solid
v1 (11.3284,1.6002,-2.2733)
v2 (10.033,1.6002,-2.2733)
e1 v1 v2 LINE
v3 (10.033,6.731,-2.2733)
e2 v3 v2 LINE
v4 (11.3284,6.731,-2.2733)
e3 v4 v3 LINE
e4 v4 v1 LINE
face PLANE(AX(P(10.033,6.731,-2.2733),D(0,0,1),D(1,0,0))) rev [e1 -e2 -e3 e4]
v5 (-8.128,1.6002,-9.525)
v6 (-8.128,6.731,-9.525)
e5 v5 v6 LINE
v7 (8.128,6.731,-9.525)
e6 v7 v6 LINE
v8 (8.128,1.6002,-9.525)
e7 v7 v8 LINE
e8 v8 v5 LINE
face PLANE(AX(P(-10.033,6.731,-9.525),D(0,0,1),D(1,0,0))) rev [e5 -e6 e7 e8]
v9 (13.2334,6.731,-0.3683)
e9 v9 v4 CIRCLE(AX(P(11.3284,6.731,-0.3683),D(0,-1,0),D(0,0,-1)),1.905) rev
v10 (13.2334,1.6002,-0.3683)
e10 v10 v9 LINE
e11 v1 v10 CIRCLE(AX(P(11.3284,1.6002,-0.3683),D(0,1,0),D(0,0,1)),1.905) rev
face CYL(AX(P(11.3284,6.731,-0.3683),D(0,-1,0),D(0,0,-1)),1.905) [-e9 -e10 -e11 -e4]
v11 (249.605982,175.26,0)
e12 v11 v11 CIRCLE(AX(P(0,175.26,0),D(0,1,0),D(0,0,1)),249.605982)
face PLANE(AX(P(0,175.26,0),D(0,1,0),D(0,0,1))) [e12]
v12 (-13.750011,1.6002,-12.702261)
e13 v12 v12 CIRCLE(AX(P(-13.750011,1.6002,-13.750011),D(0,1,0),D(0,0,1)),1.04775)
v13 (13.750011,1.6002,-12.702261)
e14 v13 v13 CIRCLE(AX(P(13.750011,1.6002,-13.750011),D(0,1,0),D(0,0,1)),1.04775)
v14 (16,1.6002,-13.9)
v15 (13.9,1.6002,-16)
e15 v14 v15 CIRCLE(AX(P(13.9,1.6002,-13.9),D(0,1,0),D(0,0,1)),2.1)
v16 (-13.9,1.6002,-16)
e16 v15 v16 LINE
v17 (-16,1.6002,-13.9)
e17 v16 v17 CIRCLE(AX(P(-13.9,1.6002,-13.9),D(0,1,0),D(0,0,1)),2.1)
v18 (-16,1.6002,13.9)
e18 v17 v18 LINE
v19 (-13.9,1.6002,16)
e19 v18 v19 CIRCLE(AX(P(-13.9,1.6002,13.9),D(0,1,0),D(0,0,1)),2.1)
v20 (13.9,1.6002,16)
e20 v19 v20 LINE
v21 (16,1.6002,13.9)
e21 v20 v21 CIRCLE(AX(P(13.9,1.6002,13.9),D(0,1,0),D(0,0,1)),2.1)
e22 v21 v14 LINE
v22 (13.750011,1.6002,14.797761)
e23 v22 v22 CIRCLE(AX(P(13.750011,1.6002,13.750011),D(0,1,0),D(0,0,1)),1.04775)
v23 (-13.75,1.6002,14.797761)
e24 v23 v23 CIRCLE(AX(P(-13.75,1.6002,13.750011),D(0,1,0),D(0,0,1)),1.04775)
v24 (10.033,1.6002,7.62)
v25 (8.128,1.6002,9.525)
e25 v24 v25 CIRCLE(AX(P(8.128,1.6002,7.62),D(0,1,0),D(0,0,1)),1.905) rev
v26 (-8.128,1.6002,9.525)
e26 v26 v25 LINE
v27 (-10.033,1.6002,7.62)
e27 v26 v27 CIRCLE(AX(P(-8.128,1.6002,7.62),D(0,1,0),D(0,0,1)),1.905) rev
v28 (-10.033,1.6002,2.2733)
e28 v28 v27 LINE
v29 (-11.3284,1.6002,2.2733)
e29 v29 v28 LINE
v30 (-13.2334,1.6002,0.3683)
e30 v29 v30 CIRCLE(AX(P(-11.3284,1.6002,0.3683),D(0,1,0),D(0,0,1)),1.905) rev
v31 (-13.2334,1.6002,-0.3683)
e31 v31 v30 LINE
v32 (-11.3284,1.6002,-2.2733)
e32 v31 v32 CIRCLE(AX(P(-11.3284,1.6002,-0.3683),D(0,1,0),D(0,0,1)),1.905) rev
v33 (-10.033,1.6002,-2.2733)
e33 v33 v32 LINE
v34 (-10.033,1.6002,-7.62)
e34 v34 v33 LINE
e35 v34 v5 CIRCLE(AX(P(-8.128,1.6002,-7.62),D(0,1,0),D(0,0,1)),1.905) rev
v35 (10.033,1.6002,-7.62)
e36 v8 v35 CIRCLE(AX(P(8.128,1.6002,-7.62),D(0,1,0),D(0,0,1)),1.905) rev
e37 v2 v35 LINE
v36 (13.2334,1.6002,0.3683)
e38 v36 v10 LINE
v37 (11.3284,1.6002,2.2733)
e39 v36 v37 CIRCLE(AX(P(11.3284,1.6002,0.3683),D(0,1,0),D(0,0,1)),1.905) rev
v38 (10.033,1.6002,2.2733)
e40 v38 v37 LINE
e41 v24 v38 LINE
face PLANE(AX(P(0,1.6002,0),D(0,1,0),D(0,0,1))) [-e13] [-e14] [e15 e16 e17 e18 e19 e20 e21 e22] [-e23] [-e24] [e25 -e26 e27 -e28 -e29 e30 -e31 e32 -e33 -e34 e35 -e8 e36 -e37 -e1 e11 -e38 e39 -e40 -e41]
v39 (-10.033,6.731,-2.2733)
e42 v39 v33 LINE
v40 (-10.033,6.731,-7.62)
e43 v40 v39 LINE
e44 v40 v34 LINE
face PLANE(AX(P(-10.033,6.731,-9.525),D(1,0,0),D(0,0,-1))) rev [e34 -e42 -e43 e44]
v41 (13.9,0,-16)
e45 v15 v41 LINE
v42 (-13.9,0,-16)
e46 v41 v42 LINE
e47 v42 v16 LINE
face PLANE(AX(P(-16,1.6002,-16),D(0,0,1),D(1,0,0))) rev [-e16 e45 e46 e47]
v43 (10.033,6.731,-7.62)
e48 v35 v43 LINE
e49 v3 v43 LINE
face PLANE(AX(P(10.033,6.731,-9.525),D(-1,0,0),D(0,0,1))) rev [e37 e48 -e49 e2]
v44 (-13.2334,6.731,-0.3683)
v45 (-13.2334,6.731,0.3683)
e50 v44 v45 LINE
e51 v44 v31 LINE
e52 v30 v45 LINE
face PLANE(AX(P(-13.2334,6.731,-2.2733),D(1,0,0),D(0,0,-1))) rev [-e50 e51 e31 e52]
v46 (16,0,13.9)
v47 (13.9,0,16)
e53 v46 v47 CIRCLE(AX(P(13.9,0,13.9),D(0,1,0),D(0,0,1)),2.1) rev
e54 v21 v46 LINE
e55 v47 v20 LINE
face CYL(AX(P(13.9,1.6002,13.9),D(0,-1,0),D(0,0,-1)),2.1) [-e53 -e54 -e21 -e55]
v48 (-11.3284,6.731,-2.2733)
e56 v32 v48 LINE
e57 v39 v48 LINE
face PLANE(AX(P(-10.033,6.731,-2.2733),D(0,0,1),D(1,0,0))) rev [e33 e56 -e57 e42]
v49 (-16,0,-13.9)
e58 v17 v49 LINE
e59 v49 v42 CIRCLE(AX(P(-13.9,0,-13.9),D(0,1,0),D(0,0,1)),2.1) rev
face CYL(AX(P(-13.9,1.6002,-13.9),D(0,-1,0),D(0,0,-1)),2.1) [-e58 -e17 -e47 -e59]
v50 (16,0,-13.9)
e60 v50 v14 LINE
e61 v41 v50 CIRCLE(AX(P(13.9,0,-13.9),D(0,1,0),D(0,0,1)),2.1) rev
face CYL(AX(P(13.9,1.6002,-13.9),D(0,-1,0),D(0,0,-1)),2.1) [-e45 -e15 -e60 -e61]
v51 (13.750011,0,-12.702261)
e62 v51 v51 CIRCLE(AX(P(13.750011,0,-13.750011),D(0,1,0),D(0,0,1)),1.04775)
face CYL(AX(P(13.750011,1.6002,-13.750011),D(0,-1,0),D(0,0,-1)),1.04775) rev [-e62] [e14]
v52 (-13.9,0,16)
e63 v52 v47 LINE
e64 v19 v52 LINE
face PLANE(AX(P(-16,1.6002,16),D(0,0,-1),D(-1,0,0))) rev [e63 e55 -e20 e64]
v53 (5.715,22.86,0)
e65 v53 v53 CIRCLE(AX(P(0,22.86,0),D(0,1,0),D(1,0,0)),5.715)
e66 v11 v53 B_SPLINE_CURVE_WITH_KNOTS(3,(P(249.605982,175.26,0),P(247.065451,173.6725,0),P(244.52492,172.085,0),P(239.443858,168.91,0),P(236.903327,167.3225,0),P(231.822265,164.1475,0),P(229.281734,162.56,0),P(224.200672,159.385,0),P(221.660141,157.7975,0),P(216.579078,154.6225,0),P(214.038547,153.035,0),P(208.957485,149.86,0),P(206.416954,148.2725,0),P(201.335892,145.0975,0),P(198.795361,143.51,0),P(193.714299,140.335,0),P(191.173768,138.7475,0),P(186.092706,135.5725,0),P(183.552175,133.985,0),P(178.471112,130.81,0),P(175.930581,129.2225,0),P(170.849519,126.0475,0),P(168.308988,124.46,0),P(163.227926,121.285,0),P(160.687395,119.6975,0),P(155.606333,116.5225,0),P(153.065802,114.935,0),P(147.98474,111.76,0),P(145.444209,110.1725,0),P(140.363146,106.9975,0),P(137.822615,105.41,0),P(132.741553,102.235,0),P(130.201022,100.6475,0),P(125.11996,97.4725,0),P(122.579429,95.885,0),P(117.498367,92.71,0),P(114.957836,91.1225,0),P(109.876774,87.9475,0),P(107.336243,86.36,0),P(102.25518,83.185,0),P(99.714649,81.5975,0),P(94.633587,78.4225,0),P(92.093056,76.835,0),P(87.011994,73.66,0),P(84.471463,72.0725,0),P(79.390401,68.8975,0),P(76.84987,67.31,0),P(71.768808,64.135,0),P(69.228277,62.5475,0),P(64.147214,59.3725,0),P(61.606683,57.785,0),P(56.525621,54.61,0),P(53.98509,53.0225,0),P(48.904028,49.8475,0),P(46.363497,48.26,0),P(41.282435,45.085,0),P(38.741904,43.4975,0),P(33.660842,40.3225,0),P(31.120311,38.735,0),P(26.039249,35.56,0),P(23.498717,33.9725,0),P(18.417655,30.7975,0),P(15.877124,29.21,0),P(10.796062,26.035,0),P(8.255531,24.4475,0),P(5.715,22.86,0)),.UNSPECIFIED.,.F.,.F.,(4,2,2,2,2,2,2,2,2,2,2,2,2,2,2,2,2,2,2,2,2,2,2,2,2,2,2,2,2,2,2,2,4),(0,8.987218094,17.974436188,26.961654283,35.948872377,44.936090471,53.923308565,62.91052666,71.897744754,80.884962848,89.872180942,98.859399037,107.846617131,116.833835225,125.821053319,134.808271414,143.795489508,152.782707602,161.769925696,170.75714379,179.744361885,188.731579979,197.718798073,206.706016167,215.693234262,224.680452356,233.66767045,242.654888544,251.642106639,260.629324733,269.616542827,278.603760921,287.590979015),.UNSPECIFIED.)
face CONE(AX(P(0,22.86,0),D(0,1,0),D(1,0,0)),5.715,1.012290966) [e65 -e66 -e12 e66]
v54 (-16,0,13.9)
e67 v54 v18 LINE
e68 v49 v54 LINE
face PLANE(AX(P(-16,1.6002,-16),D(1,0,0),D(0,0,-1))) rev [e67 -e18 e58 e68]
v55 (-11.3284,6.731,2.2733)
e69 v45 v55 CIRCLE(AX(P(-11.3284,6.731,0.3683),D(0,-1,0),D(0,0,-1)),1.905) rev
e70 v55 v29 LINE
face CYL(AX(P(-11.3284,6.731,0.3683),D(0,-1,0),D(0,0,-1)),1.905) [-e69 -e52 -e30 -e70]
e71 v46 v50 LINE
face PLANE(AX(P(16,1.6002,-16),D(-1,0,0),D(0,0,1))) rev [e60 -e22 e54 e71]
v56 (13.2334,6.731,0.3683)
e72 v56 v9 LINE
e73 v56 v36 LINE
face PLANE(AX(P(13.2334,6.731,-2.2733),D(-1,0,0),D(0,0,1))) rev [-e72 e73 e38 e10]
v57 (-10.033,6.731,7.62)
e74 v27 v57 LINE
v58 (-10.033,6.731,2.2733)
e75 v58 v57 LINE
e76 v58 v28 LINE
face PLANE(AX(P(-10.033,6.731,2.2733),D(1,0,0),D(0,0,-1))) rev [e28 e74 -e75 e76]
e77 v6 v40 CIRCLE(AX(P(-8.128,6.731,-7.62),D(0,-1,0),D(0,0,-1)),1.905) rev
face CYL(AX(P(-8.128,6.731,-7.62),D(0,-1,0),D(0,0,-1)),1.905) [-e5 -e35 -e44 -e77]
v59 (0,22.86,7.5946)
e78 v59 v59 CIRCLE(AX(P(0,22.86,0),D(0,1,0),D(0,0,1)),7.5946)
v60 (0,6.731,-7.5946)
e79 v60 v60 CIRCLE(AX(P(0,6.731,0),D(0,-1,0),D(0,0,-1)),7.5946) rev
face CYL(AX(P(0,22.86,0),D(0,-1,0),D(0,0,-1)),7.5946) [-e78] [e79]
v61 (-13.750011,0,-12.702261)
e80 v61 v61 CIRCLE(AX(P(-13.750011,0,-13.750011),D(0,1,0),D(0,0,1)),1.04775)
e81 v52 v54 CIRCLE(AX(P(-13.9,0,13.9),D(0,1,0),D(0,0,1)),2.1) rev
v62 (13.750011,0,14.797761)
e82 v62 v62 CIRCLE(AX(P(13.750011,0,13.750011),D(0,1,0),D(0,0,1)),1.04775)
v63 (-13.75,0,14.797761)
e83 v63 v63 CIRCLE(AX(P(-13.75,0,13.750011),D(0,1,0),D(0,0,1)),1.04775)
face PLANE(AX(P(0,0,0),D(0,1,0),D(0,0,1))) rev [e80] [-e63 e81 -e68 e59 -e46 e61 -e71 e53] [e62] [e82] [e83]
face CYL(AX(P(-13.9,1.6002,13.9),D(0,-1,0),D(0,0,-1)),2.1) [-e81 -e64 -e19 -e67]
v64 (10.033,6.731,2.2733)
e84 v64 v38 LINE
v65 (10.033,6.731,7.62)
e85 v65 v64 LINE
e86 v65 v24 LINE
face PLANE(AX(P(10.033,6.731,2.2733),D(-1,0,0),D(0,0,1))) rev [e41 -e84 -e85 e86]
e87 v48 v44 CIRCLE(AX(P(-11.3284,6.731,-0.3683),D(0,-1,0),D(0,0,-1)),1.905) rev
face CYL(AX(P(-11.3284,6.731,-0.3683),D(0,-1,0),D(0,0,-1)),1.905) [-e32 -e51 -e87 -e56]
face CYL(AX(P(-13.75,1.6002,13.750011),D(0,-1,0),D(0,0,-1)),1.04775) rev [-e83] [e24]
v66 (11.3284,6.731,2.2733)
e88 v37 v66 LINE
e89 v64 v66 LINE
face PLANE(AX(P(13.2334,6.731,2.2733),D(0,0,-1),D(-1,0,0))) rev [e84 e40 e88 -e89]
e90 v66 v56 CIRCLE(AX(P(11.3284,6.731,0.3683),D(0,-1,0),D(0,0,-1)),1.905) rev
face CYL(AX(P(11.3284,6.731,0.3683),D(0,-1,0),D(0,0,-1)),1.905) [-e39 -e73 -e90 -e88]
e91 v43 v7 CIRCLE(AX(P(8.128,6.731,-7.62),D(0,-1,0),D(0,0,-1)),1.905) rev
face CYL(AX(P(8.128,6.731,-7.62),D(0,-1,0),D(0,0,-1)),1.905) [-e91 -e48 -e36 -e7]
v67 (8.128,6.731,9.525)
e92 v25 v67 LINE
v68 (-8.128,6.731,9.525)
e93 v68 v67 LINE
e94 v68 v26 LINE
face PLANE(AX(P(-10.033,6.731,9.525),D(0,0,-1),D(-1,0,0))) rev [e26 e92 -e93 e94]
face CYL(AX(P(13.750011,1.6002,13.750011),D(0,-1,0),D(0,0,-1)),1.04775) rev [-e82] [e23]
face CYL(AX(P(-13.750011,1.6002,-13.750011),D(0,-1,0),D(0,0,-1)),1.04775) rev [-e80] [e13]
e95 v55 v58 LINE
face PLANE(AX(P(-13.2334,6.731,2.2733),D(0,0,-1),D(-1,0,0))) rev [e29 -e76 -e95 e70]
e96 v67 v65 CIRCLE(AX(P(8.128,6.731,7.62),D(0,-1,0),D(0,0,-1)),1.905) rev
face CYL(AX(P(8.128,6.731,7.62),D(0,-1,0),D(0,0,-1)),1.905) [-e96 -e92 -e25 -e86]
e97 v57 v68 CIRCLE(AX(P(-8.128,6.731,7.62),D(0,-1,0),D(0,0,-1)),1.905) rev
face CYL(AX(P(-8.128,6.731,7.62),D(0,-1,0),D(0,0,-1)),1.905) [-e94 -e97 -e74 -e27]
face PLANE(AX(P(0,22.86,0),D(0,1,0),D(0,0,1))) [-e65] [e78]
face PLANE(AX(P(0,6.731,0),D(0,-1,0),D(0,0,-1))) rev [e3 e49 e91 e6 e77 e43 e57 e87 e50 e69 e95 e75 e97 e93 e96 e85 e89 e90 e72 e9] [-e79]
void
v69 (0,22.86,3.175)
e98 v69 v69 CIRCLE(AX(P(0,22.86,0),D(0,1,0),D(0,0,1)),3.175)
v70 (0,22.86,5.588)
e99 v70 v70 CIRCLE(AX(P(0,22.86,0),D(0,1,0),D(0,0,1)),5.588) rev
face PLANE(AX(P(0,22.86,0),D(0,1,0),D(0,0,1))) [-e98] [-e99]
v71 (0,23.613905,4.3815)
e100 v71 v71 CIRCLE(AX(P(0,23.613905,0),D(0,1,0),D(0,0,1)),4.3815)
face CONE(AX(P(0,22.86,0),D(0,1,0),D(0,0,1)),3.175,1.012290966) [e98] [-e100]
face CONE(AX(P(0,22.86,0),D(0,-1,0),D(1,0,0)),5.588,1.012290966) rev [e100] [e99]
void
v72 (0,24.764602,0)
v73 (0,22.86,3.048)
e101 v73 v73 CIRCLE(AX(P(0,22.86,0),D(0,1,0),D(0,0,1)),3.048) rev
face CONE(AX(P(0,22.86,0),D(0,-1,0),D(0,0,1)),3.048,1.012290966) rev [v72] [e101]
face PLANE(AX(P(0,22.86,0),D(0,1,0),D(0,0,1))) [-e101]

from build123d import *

# Parameters (mm, degrees)
SKETCH1_W           = 32
SKETCH1_H           = 32
SKETCH1_R           = 1.04775
BOSS_EXTRUDE1_DEPTH = 1.6002
BOSS_EXTRUDE2_DEPTH = 5.1308
FILLET1_R           = 2.1
FILLET2_R           = 1.905
SKETCH3_R           = 7.5946
BOSS_EXTRUDE3_DEPTH = 16.129


# Read off the part's stored shape, not the designer's step: Extrude-Thin2
with BuildPart() as part:
    # Sketch1 → Boss-Extrude1 (new body)
    with BuildSketch(Plane(origin=(0, 0, 0), x_dir=(1, 0, 0), z_dir=(0, 1, 0))):
        Rectangle(SKETCH1_W, SKETCH1_H)
        with Locations(Location((13.7500106, 13.7500106, 0), (0, 0, 270))):
            Circle(SKETCH1_R, mode=Mode.SUBTRACT)
        with Locations(Location((-13.7500106, 13.7500106, 0), (0, 0, 270))):
            Circle(SKETCH1_R, mode=Mode.SUBTRACT)
        with Locations(Location((-13.75, -13.7500106, 0), (0, 0, 270))):
            Circle(SKETCH1_R, mode=Mode.SUBTRACT)
        with Locations(Location((13.7500106, -13.7500106, 0), (0, 0, 270))):
            Circle(SKETCH1_R, mode=Mode.SUBTRACT)
    extrude(amount=BOSS_EXTRUDE1_DEPTH)

    # Sketch2 → Boss-Extrude2 (add)
    with BuildSketch(Plane(origin=(0, 1.6002, 0), x_dir=(1, 0, 0), z_dir=(0, 1, 0))):
        Polygon((-10.033, 9.525), (10.033, 9.525), (10.033, 2.2733), (13.2334, 2.2733), (13.2334, -2.2733), (10.033, -2.2733), (10.033, -9.525), (-10.033, -9.525), (-10.033, -2.2733), (-13.2334, -2.2733), (-13.2334, 2.2733), (-10.033, 2.2733), align=None)
    extrude(amount=BOSS_EXTRUDE2_DEPTH)

    # Fillet1
    fillet1_edges = [part.edges().sort_by_distance(p)[0] for p in [
        (-16, 0.8001, -16),
        (16, 0.8001, -16),
        (16, 0.8001, 16),
        (-16, 0.8001, 16),
    ]]
    fillet(fillet1_edges, radius=FILLET1_R)

    # Fillet2
    fillet2_edges = [part.edges().sort_by_distance(p)[0] for p in [
        (-10.033, 4.1656, -9.525),
        (-13.2334, 4.1656, -2.2733),
        (-13.2334, 4.1656, 2.2733),
        (-10.033, 4.1656, 9.525),
        (10.033, 4.1656, 9.525),
        (13.2334, 4.1656, 2.2733),
        (13.2334, 4.1656, -2.2733),
        (10.033, 4.1656, -9.525),
    ]]
    fillet(fillet2_edges, radius=FILLET2_R)

    # Sketch3 → Boss-Extrude3 (add)
    with BuildSketch(Plane(origin=(0, 6.731, 0), x_dir=(1, 0, 0), z_dir=(0, 1, 0))):
        with Locations(Location((0, 0, 0), (0, 0, 90))):
            Circle(SKETCH3_R)
    extrude(amount=BOSS_EXTRUDE3_DEPTH)

    # Extrude-Thin2 outline → Extrude-Thin2 (revolve)
    with BuildSketch(Plane.XY):
        Polygon((0, 175.26), (0, 24.764601785), (3.048, 22.86), (3.175, 22.86), (4.3815, 23.613904873), (5.588, 22.86), (5.715, 22.86), (249.605982226, 175.26), align=None)
    revolve(axis=Axis((0, 0, 0), (0, 1, 0)))


solid = part.part
